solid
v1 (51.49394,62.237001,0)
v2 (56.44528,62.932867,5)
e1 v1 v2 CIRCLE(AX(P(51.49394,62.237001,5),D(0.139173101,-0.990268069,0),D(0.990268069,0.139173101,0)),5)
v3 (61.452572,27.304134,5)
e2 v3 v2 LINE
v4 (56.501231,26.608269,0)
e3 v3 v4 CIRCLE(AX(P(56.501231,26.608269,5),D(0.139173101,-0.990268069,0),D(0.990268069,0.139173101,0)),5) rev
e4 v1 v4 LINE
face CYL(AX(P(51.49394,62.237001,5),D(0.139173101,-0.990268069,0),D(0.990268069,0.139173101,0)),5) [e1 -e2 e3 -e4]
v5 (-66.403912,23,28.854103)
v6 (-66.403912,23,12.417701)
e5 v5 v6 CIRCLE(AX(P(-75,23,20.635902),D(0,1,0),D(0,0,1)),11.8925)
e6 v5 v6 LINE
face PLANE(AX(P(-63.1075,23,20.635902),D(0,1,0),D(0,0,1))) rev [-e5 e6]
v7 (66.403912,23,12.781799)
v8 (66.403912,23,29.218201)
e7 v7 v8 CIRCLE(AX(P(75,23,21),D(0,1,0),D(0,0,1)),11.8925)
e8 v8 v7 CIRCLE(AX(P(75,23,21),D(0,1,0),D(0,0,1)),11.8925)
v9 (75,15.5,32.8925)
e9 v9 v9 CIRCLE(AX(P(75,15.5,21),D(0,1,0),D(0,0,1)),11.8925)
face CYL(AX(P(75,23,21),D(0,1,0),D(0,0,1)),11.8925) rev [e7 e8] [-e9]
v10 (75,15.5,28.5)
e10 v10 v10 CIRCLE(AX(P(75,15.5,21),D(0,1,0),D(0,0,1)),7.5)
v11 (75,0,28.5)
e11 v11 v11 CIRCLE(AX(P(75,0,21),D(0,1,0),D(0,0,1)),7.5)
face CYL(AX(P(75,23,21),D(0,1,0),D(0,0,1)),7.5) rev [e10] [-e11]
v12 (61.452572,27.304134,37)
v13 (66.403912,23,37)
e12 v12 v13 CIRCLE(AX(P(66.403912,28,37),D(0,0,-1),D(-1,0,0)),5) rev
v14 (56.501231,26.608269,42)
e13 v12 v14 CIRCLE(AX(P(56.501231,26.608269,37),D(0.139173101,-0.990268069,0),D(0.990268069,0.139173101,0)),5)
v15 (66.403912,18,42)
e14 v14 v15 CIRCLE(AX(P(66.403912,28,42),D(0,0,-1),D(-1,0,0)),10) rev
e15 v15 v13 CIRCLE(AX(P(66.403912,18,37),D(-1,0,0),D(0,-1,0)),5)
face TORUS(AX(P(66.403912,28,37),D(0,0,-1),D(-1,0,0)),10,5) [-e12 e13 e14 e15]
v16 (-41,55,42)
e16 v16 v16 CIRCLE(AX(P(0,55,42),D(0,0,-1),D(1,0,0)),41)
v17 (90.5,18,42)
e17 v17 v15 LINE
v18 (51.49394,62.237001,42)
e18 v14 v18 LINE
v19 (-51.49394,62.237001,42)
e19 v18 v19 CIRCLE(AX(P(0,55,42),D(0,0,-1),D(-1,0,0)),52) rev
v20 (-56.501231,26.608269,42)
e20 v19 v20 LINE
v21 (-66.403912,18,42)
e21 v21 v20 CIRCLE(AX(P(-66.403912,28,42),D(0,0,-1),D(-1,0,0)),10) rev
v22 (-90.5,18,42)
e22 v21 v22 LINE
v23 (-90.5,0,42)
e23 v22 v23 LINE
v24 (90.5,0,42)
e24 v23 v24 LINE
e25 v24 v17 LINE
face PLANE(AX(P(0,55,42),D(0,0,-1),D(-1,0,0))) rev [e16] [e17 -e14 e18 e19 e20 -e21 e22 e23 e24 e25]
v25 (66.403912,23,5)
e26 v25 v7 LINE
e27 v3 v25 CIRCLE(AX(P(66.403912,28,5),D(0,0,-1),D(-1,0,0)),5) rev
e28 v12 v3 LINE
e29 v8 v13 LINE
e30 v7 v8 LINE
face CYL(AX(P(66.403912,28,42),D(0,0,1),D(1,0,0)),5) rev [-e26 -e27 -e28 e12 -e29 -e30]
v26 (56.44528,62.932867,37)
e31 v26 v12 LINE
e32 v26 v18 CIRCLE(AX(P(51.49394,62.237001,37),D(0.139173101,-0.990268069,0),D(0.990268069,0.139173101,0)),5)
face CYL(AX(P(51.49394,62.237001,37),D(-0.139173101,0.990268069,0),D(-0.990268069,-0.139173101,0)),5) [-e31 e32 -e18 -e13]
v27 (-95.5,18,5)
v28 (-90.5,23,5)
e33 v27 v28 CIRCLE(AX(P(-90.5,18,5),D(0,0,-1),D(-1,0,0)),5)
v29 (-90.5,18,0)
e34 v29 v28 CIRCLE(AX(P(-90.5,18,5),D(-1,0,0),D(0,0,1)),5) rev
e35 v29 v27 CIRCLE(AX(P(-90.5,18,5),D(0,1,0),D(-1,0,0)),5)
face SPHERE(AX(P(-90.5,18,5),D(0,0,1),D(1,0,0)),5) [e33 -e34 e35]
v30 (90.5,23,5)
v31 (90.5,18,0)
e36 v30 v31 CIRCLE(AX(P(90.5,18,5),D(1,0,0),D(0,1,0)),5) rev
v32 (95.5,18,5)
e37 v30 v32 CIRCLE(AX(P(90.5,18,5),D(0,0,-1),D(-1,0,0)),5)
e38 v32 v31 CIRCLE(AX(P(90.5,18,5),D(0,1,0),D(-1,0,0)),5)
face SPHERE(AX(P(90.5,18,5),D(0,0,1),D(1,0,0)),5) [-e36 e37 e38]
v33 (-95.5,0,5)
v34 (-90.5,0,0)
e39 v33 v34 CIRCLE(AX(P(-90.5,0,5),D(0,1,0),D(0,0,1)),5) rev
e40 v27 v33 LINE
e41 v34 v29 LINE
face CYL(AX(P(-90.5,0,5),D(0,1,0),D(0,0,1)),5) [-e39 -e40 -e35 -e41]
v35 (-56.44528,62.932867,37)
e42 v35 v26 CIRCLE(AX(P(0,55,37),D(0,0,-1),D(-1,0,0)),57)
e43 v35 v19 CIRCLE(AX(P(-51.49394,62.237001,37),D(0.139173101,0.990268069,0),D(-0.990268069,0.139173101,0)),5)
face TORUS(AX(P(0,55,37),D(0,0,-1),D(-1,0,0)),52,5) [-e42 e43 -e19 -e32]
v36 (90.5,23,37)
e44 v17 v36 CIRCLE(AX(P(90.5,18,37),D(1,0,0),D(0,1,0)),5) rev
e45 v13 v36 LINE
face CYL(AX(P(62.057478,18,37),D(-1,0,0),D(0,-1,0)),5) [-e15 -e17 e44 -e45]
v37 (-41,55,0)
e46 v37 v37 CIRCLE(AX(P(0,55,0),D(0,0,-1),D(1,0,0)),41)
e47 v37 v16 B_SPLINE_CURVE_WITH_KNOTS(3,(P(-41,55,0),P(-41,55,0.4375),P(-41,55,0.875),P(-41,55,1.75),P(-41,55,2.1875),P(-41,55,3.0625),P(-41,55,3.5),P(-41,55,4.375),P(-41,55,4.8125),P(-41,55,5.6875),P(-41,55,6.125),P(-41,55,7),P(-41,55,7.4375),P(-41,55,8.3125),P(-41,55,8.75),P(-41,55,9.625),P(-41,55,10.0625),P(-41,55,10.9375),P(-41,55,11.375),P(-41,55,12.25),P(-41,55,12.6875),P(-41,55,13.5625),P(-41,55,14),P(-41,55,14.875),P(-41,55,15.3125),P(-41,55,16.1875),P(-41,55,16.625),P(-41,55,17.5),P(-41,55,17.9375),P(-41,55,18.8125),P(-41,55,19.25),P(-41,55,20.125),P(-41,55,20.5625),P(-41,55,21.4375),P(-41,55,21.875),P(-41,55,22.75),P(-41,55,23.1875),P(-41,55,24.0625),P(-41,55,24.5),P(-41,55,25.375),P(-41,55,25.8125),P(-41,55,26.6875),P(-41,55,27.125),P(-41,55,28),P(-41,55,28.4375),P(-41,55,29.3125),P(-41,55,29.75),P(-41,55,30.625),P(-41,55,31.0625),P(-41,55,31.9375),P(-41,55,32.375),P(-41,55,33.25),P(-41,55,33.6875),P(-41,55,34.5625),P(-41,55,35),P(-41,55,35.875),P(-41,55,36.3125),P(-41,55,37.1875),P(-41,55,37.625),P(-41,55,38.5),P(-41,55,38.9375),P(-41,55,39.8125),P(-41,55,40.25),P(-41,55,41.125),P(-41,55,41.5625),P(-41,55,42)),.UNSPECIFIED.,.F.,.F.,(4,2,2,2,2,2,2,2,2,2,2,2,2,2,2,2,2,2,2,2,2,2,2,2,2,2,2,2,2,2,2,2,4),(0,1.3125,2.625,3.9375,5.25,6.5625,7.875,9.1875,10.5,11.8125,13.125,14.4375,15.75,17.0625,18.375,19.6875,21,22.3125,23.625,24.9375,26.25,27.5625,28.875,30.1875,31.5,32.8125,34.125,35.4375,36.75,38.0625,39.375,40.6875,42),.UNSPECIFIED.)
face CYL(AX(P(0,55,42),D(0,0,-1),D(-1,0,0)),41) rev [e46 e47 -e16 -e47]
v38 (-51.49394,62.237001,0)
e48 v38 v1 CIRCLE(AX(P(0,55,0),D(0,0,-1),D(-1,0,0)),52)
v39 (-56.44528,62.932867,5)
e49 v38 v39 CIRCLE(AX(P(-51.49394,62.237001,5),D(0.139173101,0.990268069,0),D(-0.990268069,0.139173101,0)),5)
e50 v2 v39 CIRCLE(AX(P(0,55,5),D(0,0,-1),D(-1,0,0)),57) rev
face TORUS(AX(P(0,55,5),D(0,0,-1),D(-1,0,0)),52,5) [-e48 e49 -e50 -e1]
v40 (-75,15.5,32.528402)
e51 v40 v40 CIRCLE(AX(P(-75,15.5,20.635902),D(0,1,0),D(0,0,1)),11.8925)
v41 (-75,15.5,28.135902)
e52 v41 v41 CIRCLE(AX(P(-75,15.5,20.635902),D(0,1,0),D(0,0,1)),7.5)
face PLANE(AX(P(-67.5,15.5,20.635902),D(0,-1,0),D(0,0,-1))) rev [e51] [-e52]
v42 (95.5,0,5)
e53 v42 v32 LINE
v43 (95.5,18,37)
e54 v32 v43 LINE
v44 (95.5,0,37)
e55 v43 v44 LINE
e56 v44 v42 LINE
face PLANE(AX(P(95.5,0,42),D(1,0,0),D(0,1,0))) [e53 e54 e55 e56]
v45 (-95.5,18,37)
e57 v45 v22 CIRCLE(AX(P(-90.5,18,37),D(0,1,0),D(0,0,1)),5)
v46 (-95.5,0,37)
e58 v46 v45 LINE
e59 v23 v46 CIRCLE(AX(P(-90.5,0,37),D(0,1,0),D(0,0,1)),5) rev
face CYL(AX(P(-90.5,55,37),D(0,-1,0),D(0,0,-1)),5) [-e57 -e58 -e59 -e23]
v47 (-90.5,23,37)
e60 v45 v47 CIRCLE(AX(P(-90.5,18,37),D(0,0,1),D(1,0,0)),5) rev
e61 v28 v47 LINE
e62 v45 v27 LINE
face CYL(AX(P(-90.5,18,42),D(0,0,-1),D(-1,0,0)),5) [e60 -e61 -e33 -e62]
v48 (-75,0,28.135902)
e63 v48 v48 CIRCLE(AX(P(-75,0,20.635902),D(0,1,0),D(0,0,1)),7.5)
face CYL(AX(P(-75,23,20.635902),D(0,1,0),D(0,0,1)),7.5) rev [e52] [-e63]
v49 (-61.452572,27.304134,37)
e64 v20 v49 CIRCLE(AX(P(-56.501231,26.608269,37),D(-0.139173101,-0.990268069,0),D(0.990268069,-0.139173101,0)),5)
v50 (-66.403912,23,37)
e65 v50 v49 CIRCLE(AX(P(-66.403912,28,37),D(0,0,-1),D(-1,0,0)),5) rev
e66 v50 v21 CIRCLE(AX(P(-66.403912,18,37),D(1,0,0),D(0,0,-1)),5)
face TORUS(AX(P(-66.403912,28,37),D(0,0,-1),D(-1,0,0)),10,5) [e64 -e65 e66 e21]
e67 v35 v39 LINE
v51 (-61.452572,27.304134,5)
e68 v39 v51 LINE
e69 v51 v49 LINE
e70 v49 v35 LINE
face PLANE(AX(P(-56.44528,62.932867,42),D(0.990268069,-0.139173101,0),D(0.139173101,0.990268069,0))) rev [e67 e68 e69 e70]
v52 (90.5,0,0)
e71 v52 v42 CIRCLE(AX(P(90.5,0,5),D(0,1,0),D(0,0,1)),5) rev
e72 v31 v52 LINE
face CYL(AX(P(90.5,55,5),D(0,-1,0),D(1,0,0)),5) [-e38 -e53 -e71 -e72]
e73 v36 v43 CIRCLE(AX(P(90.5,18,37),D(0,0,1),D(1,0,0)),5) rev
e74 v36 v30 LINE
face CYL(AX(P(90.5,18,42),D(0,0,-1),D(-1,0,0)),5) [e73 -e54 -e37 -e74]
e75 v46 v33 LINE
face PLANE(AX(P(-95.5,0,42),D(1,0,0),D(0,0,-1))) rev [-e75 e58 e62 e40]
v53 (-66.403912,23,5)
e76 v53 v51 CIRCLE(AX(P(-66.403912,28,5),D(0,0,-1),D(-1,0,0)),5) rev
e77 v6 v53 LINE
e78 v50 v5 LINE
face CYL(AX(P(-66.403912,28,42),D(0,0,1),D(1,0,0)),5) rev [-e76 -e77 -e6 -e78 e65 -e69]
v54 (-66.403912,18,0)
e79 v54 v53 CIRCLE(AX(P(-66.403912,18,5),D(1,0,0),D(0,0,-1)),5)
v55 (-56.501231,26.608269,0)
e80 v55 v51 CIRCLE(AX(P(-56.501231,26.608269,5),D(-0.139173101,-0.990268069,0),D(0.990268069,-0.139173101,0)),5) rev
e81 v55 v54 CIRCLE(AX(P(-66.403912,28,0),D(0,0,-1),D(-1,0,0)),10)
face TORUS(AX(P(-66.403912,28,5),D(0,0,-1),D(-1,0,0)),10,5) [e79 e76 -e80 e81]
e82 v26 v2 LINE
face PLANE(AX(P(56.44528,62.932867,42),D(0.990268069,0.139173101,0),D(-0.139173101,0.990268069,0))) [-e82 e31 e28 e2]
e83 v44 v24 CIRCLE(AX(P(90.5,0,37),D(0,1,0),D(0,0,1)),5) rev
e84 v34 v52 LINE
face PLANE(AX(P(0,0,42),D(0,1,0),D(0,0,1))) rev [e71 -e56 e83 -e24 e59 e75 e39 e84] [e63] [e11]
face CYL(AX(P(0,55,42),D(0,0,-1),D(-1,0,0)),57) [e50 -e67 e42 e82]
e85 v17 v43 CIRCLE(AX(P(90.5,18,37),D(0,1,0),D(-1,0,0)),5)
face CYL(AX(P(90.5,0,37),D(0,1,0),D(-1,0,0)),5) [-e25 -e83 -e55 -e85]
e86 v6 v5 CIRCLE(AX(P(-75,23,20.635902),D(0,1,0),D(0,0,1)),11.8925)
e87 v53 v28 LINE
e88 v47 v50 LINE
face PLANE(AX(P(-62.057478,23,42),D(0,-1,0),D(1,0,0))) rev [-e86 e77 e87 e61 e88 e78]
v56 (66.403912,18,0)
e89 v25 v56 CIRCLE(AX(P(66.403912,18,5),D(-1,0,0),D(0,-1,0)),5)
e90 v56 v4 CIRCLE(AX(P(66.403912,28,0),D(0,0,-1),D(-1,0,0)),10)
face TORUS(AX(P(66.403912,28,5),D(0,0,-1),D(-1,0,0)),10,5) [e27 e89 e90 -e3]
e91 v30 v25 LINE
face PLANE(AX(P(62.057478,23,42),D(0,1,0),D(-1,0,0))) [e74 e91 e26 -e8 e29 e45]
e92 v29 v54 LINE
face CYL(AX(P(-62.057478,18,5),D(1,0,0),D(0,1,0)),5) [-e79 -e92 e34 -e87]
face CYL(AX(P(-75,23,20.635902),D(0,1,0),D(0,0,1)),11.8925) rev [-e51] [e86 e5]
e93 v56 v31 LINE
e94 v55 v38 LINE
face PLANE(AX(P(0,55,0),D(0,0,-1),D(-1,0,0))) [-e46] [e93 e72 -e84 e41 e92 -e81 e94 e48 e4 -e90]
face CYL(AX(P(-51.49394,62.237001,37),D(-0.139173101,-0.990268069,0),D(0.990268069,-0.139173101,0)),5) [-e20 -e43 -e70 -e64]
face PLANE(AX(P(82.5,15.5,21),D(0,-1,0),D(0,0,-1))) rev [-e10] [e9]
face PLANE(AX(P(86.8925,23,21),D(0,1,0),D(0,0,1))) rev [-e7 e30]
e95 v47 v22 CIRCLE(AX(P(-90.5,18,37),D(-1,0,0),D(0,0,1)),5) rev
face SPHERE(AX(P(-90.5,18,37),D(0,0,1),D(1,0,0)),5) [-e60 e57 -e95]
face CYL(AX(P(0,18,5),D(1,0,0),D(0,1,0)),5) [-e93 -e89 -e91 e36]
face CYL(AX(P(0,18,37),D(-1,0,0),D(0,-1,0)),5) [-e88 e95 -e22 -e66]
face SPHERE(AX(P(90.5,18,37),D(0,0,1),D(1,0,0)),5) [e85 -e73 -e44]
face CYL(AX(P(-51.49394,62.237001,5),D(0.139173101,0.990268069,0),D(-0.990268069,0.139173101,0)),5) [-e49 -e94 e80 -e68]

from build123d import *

# Parameters (mm, degrees)
BOSS_EXTRUDE1_DEPTH                        = 42
FILLET1_R                                  = 5
CBORE_FOR_M12_HEX_HEAD_BOLT2_OUTLINE_R     = 7.5
CBORE_FOR_M12_HEX_HEAD_BOLT2_DEPTH         = 23
CBORE_START                                = 15.5
CBORE_FOR_M12_HEX_HEAD_BOLT2_2_OUTLINE_R   = 11.8925
CBORE_FOR_M12_HEX_HEAD_BOLT2_2_OUTLINE_R_2 = 7.5
CBORE_FOR_M12_HEX_HEAD_BOLT2_2_DEPTH       = 7.5


# Read off the part's stored shape, not the designer's step: CBORE for M12 Hex Head Bolt2
with BuildPart() as part:
    # Sketch1 → Boss-Extrude1 (new body)
    with BuildSketch(Plane.XY):
        with BuildLine():
            Line((0, 0), (-95.5, 0))
            Line((-95.5, 0), (-95.5, 23))
            Line((-95.5, 23), (-62.057478344, 23))
            Line((-62.057478344, 23), (-56.445279918, 62.932866755))
            ThreePointArc((-56.445279918, 62.932866755), (-37.395364652, 98.018446073), (0, 112))
            Line((0, 112), (0, 96))
            ThreePointArc((0, 96), (-41, 55), (0, 14))
            Line((0, 14), (0, 0))
        make_face()
    boss_extrude1 = extrude(amount=BOSS_EXTRUDE1_DEPTH)

    # Mirror1: Boss-Extrude1 across plane
    add(boss_extrude1.mirror(Plane(origin=(0, 112, 42), x_dir=(0, 0, 1), z_dir=(-1, 0, 0))))

    # Fillet1
    fillet1_edges = [part.edges().sort_by_distance(p)[0] for p in [
        (0, 112, 0),
        (-95.5, 23, 21),
        (-62.057478344, 23, 21),
        (0, 112, 42),
        (-59.251379131, 42.966433377, 42),
        (95.5, 11.5, 42),
        (-78.778739172, 23, 42),
        (78.778739172, 23, 42),
        (95.5, 23, 21),
        (59.251379131, 42.966433377, 42),
        (62.057478344, 23, 21),
        (59.251379131, 42.966433377, 0),
        (78.778739172, 23, 0),
        (-95.5, 11.5, 42),
        (95.5, 11.5, 0),
        (-95.5, 11.5, 0),
        (-78.778739172, 23, 0),
        (-59.251379131, 42.966433377, 0),
    ]]
    fillet(fillet1_edges, radius=FILLET1_R)

    # CBORE for M12 Hex Head Bolt2 outline → CBORE for M12 Hex Head Bolt2 (cut)
    with BuildSketch(Plane(origin=(0, 0, 0), x_dir=(1, 0, 0), z_dir=(0, 1, 0))):
        with Locations((75, -21)):
            Circle(CBORE_FOR_M12_HEX_HEAD_BOLT2_OUTLINE_R)
        with Locations((-75, -20.635902385)):
            Circle(CBORE_FOR_M12_HEX_HEAD_BOLT2_OUTLINE_R)
    extrude(amount=CBORE_FOR_M12_HEX_HEAD_BOLT2_DEPTH, mode=Mode.SUBTRACT)

    # CBORE for M12 Hex Head Bolt2 2 outline → CBORE for M12 Hex Head Bolt2 2 (cut)
    # profile 1 of 2: a face of its own
    with BuildSketch(Plane(origin=(0, 0, 0), x_dir=(1, 0, 0), z_dir=(0, 1, 0)).offset(CBORE_START)):
        with Locations((75, -21)):
            Circle(CBORE_FOR_M12_HEX_HEAD_BOLT2_2_OUTLINE_R)
        with Locations((75, -21)):
            Circle(CBORE_FOR_M12_HEX_HEAD_BOLT2_2_OUTLINE_R_2, mode=Mode.SUBTRACT)
    # profile 2 of 2: a face of its own
    with BuildSketch(Plane(origin=(0, 0, 0), x_dir=(1, 0, 0), z_dir=(0, 1, 0)).offset(CBORE_START)):
        with Locations((-75, -20.635902385)):
            Circle(CBORE_FOR_M12_HEX_HEAD_BOLT2_2_OUTLINE_R)
        with Locations((-75, -20.635902385)):
            Circle(CBORE_FOR_M12_HEX_HEAD_BOLT2_2_OUTLINE_R_2, mode=Mode.SUBTRACT)
    extrude(amount=CBORE_FOR_M12_HEX_HEAD_BOLT2_2_DEPTH, mode=Mode.SUBTRACT)


solid = part.part
